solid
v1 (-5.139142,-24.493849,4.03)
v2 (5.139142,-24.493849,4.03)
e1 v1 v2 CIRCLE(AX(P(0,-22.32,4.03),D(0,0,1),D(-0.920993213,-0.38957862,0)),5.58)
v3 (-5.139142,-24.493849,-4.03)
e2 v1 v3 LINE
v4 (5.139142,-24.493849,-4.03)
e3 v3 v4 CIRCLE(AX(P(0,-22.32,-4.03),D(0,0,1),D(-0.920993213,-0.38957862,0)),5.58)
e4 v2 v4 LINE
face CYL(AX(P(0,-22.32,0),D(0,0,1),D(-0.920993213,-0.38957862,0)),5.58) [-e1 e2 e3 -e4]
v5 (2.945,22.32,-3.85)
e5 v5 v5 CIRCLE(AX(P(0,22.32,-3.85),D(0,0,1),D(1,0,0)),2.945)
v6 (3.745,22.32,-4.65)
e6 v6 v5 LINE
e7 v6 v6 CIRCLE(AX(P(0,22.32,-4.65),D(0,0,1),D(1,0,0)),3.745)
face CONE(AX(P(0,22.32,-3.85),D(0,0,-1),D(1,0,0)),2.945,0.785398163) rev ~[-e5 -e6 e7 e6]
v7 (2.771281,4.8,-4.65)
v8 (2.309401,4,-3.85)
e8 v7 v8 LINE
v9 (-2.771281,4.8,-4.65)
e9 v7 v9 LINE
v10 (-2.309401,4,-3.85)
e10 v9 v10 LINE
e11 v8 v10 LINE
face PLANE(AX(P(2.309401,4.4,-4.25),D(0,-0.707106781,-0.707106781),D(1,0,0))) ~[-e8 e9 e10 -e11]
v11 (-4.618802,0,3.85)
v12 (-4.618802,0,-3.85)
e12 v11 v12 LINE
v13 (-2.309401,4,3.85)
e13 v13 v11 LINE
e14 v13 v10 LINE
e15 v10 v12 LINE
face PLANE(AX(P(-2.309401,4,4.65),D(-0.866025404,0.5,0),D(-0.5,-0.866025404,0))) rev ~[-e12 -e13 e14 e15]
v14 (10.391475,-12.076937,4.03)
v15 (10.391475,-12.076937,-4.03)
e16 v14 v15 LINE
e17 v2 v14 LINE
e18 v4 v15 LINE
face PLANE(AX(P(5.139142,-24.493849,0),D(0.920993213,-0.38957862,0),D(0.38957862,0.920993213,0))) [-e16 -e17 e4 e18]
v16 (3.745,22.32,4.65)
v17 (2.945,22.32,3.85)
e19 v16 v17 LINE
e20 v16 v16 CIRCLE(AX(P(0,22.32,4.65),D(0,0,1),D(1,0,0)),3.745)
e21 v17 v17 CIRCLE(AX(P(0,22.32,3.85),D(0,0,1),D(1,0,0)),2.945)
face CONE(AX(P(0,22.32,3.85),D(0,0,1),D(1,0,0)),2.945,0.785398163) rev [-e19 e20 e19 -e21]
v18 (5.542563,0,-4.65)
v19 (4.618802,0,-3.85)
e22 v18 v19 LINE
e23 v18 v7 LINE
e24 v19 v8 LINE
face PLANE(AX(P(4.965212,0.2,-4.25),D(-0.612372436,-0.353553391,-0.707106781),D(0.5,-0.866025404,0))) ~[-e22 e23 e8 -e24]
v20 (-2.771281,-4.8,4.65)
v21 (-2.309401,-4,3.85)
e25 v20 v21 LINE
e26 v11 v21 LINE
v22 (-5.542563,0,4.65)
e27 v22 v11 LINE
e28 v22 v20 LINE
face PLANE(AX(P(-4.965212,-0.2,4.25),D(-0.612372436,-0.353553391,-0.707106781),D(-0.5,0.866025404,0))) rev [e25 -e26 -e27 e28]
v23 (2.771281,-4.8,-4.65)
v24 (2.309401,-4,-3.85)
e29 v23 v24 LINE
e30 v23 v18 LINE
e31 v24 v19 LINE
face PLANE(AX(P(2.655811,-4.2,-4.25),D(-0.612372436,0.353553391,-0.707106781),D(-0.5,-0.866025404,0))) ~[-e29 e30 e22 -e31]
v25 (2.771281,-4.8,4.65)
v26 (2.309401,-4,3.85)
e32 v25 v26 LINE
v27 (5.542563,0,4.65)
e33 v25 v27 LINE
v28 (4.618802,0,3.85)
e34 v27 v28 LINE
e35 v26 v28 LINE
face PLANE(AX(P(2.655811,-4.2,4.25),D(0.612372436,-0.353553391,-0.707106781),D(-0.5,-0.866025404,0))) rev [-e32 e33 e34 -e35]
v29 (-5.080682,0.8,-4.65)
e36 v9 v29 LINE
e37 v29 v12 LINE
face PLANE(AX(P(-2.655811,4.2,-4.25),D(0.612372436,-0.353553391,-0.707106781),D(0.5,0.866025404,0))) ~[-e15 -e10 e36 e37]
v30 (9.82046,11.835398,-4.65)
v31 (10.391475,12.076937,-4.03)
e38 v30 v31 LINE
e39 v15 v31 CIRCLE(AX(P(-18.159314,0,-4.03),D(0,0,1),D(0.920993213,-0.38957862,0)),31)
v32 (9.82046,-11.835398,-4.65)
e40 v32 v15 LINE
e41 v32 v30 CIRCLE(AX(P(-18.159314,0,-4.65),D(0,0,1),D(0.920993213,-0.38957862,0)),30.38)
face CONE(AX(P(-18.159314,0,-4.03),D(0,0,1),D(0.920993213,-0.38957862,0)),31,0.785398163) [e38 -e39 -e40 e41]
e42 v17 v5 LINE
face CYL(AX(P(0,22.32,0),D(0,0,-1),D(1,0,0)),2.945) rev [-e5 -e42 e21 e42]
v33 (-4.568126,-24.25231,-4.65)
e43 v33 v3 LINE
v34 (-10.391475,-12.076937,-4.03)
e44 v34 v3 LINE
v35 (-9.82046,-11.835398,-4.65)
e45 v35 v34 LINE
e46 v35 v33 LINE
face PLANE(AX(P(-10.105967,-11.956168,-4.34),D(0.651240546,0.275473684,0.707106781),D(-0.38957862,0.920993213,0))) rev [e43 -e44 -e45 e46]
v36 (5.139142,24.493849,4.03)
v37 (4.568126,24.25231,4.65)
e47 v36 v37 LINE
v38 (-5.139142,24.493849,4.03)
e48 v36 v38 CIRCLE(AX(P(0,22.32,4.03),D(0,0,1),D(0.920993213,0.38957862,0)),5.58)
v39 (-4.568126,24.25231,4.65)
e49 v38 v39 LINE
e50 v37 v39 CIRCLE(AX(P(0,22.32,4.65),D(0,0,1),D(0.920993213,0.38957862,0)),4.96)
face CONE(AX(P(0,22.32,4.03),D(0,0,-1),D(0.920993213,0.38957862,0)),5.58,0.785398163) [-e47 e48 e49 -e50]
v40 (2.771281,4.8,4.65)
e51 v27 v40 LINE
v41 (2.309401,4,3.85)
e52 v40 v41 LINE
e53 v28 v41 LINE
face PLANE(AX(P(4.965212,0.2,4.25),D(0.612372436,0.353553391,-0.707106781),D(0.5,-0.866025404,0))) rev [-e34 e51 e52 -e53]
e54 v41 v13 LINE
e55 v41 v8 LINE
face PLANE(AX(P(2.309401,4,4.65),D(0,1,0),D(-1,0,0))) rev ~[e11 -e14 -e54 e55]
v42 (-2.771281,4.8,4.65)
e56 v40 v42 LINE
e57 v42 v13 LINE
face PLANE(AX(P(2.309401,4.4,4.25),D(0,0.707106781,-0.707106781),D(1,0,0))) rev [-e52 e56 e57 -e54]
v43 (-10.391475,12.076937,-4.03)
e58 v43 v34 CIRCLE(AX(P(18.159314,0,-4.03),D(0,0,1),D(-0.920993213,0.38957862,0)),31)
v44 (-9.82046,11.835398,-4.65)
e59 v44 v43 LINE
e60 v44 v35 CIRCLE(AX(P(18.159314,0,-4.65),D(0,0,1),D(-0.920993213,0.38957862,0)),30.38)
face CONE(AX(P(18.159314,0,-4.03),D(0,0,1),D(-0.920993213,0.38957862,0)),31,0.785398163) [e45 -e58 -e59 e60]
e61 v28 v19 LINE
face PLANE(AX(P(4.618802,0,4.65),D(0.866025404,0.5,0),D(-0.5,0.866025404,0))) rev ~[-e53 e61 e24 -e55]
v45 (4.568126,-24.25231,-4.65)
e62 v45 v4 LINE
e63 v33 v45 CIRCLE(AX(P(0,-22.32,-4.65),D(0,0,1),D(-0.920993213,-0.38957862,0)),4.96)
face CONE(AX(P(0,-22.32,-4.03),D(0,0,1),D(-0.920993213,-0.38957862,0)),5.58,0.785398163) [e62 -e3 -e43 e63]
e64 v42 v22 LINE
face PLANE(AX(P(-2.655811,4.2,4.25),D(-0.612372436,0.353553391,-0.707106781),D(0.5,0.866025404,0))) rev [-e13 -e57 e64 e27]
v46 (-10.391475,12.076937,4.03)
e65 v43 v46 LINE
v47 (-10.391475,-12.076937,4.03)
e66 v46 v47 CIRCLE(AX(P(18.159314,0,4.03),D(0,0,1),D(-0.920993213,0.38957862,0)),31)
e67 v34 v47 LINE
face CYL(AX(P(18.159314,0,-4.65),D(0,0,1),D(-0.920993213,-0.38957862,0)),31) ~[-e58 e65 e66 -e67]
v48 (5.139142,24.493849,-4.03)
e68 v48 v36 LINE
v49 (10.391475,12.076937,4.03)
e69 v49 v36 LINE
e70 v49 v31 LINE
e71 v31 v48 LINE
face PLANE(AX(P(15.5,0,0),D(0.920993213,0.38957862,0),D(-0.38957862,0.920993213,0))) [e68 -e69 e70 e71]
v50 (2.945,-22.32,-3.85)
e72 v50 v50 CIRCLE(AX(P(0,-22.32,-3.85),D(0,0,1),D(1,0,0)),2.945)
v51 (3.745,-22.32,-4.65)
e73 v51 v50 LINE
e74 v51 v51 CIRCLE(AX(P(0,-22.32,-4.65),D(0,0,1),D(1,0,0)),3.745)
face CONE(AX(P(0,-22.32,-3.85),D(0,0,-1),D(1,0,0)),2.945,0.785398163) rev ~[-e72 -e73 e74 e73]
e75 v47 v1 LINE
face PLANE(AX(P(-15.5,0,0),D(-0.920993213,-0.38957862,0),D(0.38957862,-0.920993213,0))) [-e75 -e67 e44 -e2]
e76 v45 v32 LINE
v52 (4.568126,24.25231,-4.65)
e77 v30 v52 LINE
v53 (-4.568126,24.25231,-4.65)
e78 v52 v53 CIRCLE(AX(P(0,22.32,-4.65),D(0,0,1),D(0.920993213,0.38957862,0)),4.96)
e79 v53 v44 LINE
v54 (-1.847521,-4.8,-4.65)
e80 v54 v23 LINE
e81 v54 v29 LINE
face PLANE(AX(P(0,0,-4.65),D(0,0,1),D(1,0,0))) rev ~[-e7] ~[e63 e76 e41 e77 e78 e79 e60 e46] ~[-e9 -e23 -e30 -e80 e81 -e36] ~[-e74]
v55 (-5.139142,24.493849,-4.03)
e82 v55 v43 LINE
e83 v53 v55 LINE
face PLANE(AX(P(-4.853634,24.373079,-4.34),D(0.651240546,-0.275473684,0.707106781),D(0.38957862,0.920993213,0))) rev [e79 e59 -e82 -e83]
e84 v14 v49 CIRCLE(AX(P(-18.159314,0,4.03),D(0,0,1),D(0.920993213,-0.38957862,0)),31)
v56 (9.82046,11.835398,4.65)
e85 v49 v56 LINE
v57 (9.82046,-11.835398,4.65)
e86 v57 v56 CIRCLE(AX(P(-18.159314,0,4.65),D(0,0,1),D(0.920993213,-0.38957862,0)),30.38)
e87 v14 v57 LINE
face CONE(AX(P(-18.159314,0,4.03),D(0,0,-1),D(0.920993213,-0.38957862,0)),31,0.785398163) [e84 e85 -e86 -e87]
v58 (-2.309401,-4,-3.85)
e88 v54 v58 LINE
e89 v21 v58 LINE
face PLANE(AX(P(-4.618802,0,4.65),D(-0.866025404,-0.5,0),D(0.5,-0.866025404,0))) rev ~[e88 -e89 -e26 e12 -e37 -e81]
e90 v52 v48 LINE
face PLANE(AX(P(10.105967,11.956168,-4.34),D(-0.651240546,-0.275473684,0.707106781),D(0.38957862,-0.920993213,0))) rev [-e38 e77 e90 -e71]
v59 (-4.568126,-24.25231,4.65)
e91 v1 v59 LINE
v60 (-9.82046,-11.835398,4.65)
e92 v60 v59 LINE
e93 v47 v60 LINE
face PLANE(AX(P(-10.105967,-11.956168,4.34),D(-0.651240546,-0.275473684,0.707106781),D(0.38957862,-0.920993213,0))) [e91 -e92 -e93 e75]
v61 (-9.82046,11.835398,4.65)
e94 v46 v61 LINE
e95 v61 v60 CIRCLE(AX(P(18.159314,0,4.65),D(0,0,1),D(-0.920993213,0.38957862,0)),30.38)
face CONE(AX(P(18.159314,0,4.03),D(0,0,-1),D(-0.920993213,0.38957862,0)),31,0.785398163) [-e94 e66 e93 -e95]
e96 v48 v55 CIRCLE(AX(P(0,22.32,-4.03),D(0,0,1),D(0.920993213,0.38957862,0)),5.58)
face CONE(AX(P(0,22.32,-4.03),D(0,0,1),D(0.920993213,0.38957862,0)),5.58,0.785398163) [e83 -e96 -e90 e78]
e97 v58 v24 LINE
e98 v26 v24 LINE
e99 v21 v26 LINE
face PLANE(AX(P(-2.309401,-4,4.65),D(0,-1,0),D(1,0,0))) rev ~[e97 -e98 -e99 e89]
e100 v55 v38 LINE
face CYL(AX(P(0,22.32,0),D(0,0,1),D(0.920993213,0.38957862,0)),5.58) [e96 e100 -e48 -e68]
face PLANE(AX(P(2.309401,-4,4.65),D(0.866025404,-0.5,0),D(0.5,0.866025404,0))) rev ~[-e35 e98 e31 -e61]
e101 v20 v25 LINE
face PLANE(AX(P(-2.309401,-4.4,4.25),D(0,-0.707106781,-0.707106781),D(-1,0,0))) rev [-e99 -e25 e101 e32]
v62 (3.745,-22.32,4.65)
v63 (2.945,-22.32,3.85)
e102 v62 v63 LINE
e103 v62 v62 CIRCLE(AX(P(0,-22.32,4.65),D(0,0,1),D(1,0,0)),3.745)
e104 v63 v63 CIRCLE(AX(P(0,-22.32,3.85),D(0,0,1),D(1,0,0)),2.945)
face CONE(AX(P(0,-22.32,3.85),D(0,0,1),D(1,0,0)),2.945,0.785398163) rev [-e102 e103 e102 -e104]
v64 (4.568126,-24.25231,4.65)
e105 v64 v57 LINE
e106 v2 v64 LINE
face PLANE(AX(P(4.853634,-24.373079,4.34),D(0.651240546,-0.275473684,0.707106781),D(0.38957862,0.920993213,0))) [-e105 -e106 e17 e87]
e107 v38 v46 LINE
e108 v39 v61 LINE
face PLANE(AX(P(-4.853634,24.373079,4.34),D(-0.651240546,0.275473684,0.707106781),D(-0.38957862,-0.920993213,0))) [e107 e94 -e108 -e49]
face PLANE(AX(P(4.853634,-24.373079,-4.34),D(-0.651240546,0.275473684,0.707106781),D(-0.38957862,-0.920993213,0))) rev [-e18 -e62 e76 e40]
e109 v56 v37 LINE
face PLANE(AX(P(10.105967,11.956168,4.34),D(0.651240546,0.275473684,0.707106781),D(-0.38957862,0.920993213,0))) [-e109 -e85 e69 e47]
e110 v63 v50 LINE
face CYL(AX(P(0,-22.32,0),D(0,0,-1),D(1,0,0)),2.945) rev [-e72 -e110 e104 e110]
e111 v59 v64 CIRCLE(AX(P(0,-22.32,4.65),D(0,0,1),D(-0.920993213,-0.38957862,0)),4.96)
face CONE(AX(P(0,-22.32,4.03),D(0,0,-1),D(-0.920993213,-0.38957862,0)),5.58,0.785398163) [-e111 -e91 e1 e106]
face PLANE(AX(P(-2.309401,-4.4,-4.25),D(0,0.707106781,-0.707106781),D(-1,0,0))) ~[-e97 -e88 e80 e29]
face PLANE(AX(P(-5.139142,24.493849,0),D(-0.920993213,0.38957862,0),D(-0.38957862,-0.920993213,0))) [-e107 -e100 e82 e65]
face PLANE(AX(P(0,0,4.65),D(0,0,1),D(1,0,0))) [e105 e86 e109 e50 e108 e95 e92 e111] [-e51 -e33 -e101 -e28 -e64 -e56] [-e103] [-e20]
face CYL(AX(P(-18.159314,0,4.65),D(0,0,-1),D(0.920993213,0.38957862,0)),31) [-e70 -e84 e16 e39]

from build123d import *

# Parameters (mm, degrees)
F0_R     = 4.75
F1_DEPTH = 7.5
F2_R     = 50
F3_SIZE  = 1
F4_SCALE = 0.62
F6_DEPTH = 25
F7_SIZE  = 0.8


with BuildPart() as f1:
    # F0 (on Top) → F1 (new body, symmetric)
    with BuildSketch(Plane.XY):
        with BuildLine():
            Line((25, 0), (8.2889389183, 39.5062075821))
            ThreePointArc((8.2889389183, 39.5062075821), (0, 45), (-8.2889389183, 39.5062075821))
            Line((-8.2889389183, 39.5062075821), (-25, 0))
            Line((-25, 0), (-8.2889389183, -39.5062075821))
            ThreePointArc((-8.2889389183, -39.5062075821), (0, -45), (8.2889389183, -39.5062075821))
            Line((8.2889389183, -39.5062075821), (25, 0))
        make_face()
        with Locations((0, -36)):
            Circle(F0_R, mode=Mode.SUBTRACT)
        with Locations((0, 36)):
            Circle(F0_R, mode=Mode.SUBTRACT)
    extrude(amount=F1_DEPTH, both=True)

    # F2
    f2_edges = [f1.edges().sort_by_distance(p)[0] for p in [
        (-25, 0, 0),
        (25, 0, 0),
    ]]
    fillet(f2_edges, radius=F2_R)

    # F3
    f3_edges = [f1.edges().sort_by_distance(p)[0] for p in [
        (0, 45, 7.5),
        (0, 45, -7.5),
        (-12.524692, -29.492569, 7.5),
        (-12.524692, -29.492569, -7.5),
    ]]
    chamfer(f3_edges, length=F3_SIZE)


with BuildPart() as f1_1:
    # F4: moved
    add(f1.part.scale(F4_SCALE))

    # F5 (on face) → F6 (cut)
    with BuildSketch(Plane.XY.offset(4.65)):
        Polygon((-2.3094010768, 4), (-4.6188021535, 0), (-2.3094010768, -4), (2.3094010768, -4), (4.6188021535, 0), (2.3094010768, 4), align=None)
    extrude(amount=-F6_DEPTH, mode=Mode.SUBTRACT)

    # F7
    f7_edges = [f1_1.edges().sort_by_distance(p)[0] for p in [
        (0, -4, 4.65),
        (-3.464102, -2, 4.65),
        (-3.464102, 2, 4.65),
        (0, 4, 4.65),
        (3.464102, 2, 4.65),
        (3.464102, -2, 4.65),
        (0, -4, -4.65),
        (3.464102, -2, -4.65),
        (3.464102, 2, -4.65),
        (0, 4, -4.65),
        (-3.464102, 2, -4.65),
        (-2.945, -22.32, 4.65),
        (-2.945, 22.32, 4.65),
        (-2.945, -22.32, -4.65),
        (-2.945, 22.32, -4.65),
    ]]
    chamfer(f7_edges, length=F7_SIZE)


solid = f1_1.part
